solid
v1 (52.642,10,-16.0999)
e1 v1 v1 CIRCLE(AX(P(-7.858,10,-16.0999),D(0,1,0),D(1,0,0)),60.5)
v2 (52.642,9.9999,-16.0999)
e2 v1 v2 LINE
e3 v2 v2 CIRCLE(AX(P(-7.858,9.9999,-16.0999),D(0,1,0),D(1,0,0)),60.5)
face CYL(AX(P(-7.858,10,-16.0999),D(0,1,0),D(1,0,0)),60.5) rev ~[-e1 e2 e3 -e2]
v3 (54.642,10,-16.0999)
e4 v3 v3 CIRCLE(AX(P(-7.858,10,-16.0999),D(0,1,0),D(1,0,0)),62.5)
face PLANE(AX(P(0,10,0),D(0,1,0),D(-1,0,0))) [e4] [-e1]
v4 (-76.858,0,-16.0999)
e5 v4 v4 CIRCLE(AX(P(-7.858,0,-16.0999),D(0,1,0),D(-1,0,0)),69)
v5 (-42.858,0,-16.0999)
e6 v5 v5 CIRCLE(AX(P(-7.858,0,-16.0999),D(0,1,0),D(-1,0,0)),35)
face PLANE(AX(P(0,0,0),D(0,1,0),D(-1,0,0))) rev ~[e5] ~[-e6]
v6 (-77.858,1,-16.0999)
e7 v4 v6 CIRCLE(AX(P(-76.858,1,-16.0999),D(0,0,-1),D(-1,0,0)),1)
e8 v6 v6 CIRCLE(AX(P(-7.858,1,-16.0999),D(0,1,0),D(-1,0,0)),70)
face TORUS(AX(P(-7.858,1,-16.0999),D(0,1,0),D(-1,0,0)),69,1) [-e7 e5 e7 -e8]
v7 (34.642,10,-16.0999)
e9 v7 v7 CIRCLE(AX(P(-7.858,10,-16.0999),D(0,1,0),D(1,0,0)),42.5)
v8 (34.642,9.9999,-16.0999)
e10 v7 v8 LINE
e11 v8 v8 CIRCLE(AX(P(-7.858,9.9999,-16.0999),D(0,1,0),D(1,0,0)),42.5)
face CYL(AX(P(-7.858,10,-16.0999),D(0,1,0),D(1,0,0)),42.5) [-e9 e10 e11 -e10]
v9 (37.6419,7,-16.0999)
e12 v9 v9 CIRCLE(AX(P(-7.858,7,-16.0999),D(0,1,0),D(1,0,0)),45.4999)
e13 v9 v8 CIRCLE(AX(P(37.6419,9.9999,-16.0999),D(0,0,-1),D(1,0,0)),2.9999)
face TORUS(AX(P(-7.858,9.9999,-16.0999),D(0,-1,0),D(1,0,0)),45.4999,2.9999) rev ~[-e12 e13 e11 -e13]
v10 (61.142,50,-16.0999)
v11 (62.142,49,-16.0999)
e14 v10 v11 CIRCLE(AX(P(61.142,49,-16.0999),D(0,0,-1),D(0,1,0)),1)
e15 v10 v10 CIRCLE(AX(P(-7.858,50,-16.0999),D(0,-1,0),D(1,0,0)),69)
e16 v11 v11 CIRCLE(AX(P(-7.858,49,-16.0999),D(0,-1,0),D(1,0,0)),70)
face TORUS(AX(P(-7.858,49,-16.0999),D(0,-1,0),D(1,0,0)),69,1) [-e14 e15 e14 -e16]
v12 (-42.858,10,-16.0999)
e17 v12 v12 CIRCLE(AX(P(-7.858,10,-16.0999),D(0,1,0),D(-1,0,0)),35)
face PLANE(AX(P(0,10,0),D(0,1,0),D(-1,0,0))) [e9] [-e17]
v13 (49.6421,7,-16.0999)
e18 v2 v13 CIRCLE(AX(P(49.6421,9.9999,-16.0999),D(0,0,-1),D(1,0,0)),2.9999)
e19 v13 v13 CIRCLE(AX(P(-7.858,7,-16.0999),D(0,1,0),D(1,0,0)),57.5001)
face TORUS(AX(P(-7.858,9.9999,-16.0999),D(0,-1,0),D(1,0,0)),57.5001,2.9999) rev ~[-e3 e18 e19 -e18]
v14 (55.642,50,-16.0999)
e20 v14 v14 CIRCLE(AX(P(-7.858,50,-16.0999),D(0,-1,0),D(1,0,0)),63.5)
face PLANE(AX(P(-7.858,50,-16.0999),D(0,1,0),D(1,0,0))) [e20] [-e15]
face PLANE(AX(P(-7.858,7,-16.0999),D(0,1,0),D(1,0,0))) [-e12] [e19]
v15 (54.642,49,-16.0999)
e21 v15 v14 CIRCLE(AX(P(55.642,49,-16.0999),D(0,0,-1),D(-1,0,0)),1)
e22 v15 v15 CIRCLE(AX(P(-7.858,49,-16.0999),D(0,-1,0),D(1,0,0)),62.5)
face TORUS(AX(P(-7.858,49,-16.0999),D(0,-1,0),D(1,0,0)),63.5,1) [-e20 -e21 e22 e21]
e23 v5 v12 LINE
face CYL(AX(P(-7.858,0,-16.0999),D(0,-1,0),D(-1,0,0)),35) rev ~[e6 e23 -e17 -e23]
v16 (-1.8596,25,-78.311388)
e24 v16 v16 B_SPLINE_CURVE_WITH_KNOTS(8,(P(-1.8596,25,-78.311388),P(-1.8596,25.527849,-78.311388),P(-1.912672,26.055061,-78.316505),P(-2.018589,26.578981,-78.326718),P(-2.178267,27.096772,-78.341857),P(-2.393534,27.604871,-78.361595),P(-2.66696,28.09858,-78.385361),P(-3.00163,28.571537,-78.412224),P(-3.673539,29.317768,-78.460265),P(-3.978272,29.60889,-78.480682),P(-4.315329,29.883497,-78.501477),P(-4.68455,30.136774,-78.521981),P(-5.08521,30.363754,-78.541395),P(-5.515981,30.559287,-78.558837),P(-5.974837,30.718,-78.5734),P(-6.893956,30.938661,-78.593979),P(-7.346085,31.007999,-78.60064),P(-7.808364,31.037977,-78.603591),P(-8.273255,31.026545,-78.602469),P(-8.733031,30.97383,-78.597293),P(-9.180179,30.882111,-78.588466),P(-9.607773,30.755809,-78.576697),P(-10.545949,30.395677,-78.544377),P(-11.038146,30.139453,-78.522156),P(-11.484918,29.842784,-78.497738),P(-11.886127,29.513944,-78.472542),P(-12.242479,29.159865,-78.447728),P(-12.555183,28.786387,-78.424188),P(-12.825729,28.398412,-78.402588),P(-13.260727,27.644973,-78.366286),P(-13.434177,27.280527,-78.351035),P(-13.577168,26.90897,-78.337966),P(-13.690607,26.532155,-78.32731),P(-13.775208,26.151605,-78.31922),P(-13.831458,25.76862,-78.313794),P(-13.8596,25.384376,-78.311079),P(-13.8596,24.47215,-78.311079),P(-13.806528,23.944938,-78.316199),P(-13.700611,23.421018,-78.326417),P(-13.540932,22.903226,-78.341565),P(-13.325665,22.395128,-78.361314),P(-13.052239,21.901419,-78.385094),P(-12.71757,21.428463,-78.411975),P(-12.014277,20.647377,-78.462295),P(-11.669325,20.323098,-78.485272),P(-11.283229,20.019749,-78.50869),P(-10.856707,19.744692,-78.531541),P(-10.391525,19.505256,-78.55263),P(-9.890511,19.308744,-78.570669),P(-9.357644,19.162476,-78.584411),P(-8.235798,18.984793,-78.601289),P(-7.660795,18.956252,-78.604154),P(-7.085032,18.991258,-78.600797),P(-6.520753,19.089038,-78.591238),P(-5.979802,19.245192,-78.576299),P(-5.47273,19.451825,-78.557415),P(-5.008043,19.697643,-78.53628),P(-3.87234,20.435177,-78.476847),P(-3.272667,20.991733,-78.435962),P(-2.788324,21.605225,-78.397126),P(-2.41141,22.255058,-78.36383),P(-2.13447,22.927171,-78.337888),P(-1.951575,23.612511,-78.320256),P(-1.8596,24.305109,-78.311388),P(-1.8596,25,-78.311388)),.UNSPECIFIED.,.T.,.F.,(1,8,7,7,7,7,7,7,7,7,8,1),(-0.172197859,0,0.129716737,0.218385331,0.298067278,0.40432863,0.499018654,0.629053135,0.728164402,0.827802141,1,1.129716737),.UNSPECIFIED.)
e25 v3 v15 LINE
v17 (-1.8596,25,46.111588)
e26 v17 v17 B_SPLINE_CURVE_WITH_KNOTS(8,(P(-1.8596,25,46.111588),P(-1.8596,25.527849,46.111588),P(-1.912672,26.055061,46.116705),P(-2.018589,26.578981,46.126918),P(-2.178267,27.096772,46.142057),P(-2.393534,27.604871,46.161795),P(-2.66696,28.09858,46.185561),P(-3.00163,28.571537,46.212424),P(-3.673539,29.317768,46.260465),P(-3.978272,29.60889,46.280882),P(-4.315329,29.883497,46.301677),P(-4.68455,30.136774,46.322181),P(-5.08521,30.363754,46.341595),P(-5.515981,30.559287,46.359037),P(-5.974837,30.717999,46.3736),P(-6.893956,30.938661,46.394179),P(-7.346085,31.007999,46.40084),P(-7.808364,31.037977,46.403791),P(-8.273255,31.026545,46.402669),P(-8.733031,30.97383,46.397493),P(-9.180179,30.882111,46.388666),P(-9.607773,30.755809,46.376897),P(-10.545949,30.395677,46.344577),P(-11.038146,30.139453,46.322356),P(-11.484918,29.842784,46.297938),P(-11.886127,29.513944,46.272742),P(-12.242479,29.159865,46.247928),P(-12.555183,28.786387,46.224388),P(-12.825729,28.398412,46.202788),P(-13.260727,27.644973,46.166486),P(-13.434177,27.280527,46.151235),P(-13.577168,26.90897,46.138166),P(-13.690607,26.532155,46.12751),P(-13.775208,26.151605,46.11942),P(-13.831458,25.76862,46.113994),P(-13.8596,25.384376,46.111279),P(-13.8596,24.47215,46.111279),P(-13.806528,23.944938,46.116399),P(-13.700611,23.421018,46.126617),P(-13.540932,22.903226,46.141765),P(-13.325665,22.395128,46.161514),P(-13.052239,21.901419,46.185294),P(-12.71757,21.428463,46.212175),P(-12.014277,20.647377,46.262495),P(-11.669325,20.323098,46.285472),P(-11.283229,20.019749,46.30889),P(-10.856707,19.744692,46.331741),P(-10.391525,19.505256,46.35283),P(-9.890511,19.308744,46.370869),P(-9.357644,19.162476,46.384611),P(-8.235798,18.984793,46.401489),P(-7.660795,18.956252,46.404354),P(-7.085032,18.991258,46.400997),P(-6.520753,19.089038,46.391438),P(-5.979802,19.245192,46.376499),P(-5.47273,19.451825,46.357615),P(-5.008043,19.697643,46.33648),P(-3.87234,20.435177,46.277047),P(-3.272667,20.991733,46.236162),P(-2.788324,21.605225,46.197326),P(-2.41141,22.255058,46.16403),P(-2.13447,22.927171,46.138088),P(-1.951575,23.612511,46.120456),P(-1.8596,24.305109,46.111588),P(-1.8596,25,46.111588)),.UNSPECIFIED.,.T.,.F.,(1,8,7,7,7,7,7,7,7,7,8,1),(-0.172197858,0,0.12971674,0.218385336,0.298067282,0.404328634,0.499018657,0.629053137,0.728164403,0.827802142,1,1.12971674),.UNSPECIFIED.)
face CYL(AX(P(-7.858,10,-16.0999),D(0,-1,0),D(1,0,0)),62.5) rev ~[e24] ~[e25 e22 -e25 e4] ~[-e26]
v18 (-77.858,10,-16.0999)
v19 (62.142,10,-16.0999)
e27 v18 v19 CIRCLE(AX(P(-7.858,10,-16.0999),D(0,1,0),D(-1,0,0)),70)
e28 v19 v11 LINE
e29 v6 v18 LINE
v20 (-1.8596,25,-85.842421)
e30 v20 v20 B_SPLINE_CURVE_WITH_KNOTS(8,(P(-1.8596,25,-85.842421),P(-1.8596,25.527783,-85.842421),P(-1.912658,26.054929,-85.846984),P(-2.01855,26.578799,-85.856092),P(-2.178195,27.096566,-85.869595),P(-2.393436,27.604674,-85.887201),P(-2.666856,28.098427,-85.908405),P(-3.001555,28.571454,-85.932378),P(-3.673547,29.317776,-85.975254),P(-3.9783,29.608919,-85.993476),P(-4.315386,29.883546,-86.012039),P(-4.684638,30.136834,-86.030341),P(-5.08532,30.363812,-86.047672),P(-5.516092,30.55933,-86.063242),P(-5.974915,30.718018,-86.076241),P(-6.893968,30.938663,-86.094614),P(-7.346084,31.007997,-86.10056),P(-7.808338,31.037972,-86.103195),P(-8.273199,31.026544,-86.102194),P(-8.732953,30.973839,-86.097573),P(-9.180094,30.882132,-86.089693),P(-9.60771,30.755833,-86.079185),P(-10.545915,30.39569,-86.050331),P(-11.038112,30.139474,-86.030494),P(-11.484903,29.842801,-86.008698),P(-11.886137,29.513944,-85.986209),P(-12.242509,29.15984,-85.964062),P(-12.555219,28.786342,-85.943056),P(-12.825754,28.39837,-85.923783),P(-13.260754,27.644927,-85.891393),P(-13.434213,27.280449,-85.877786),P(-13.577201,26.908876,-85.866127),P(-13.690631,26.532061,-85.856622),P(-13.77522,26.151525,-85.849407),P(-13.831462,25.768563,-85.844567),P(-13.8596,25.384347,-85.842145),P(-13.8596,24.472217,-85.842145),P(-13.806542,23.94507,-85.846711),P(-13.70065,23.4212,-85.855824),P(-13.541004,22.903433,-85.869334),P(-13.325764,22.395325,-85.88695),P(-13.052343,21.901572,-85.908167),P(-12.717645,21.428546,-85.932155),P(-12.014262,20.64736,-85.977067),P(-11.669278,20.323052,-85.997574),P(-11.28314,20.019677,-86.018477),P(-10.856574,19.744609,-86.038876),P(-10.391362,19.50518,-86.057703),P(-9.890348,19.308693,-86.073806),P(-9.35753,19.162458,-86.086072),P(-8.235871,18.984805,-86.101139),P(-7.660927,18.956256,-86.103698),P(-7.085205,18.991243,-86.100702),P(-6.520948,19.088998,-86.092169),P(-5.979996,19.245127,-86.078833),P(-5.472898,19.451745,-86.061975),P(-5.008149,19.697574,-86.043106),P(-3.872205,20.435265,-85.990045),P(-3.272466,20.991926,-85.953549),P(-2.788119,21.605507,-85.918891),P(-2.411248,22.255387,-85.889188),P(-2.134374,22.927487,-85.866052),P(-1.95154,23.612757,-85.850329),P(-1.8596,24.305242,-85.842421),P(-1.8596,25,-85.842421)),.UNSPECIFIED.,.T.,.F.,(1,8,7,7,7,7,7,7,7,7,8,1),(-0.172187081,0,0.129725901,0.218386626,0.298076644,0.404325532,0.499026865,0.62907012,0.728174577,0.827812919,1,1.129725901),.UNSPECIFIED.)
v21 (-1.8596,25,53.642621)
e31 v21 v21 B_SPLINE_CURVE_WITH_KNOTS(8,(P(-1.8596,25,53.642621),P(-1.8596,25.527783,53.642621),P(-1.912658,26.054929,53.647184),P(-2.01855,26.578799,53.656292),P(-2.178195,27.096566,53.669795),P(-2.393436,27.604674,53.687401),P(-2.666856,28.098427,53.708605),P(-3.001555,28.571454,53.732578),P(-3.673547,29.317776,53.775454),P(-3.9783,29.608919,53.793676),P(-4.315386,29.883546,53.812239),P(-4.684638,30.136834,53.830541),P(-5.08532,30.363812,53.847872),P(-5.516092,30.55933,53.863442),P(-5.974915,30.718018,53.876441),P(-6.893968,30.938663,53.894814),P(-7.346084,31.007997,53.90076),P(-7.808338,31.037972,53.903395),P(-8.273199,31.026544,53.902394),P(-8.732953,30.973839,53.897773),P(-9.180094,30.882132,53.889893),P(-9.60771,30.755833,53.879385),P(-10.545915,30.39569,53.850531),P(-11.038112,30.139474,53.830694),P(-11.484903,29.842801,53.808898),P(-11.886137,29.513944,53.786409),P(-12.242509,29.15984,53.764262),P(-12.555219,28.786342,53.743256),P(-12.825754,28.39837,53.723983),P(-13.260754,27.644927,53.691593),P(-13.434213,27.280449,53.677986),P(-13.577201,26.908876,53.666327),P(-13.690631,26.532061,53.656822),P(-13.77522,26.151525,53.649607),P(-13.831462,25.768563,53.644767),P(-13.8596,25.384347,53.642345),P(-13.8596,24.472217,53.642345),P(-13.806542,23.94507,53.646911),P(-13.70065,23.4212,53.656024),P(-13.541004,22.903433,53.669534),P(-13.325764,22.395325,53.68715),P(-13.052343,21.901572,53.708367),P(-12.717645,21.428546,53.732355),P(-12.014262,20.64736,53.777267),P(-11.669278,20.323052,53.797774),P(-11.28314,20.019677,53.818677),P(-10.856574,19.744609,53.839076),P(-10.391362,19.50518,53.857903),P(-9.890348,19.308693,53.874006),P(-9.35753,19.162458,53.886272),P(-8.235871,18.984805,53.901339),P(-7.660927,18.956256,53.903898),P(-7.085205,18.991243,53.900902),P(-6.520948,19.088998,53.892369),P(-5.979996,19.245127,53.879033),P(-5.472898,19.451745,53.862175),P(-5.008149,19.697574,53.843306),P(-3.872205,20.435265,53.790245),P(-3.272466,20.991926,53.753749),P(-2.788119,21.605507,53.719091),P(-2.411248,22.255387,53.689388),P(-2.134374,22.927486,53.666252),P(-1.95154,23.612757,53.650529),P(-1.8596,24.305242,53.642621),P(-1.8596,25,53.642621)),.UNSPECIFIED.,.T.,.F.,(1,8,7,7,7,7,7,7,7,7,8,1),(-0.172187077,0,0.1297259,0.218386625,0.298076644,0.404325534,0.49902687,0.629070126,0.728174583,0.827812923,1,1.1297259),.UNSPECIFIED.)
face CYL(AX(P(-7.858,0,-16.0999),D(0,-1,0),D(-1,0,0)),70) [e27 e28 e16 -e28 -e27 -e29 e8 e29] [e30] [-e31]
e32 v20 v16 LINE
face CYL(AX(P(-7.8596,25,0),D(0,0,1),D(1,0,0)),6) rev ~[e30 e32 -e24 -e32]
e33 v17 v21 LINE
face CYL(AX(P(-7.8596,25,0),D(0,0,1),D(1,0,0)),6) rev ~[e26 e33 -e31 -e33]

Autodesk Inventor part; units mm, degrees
ref_plane "YZ Plane" through (0, 0, 0) normal (1, 0, 0) x (0, 1, 0)
ref_plane "XZ Plane" through (0, 0, 0) normal (0, 1, 0) x (-1, 0, 0)
ref_plane "XY Plane" through (0, 0, 0) normal (0, 0, 1) x (1, 0, 0)
sketch "Sketch1" plane through (0, 0, 0) normal (0, 1, 0) x (-1, 0, 0)
  circle A0 centre (7.858, -16.0999) radius 70
  circle A1 centre (7.858, -16.0999) radius 35
  point P0 (0, 0)
  dimension "d0" = 140
  dimension "d1" = 70
extrude "Extrusion1" add sketch "Sketch1" along normal blind 10
sketch "Sketch2" plane through (-7.858, 10, -16.0999) normal (0, 1, 0) x (1, 0, 0)
  circle A0 centre (0, 0) radius 70
  circle A1 centre (0, 0) radius 62.5
  line L0 (0, 0) -> (69.5, 0)
  line L1 (69.5, 0) -> (69.5, 27.6538)
  line L2 (69.5, 27.6538) -> (69.5, -15.3132)
  line L3 (0, 0) -> (-69.5, 0)
  line L4 (-69.5, 0) -> (-69.5, 45.4592)
  point P0 (7.858, -16.0999)
  dimension "d4" = 125
  dimension "d14" = 140
  dimension "d19" = 69.5
  dimension "d20" = 69.5
extrude "Extrusion2" add sketch "Sketch2" along normal blind 40 contours A0 L2 L1 | L1 L0 A1 L3 L4 A0 | A0 L4 L3 A1 L0 L2
sketch "Sketch3" plane through (-7.858, 10, -16.0999) normal (0, 1, 0) x (1, 0, 0)
  circle A0 centre (0, 0) radius 42.5
  circle A1 centre (0, 0) radius 60.5
  point P0 (7.858, -16.0999)
  dimension "d7" = 85
extrude "Extrusion3" cut sketch "Sketch3" against normal blind 3
fillet "Fillet1" radius 3 1 edges at (-68.358, 7, -16.0999)
fillet "Fillet2" radius 3 1 edges at (-50.358, 7, -16.0999)
fillet "Fillet3" radius 1 2 edges at (-77.858, 50, -16.0999) (-70.358, 50, -16.0999)
fillet "Fillet4" radius 1 1 edges at (62.142, 0, -16.0999)
sketch "Sketch4" plane through (0, 0, 0) normal (0, 1, 0) x (-1, 0, 0)
  point P0 (0, 0)
sketch "Sketch5" plane through (0, 0, 0) normal (0, 0, 1) x (1, 0, 0)
  line L0 (-77.858, 1) -> (62.142, 1) projected
  line L1 (62.1388, 1) -> (-77.858, 49)
  line L2 (62.142, 49) -> (-77.858, 49) projected
  circle A0 centre (-7.8596, 25) radius 6
  point P0 (0, 0)
  dimension "d15" = 12
extrude "Extrusion4" cut sketch "Sketch5" along normal mid plane 300
properties part number "Rolamento_Inferior_Base"
